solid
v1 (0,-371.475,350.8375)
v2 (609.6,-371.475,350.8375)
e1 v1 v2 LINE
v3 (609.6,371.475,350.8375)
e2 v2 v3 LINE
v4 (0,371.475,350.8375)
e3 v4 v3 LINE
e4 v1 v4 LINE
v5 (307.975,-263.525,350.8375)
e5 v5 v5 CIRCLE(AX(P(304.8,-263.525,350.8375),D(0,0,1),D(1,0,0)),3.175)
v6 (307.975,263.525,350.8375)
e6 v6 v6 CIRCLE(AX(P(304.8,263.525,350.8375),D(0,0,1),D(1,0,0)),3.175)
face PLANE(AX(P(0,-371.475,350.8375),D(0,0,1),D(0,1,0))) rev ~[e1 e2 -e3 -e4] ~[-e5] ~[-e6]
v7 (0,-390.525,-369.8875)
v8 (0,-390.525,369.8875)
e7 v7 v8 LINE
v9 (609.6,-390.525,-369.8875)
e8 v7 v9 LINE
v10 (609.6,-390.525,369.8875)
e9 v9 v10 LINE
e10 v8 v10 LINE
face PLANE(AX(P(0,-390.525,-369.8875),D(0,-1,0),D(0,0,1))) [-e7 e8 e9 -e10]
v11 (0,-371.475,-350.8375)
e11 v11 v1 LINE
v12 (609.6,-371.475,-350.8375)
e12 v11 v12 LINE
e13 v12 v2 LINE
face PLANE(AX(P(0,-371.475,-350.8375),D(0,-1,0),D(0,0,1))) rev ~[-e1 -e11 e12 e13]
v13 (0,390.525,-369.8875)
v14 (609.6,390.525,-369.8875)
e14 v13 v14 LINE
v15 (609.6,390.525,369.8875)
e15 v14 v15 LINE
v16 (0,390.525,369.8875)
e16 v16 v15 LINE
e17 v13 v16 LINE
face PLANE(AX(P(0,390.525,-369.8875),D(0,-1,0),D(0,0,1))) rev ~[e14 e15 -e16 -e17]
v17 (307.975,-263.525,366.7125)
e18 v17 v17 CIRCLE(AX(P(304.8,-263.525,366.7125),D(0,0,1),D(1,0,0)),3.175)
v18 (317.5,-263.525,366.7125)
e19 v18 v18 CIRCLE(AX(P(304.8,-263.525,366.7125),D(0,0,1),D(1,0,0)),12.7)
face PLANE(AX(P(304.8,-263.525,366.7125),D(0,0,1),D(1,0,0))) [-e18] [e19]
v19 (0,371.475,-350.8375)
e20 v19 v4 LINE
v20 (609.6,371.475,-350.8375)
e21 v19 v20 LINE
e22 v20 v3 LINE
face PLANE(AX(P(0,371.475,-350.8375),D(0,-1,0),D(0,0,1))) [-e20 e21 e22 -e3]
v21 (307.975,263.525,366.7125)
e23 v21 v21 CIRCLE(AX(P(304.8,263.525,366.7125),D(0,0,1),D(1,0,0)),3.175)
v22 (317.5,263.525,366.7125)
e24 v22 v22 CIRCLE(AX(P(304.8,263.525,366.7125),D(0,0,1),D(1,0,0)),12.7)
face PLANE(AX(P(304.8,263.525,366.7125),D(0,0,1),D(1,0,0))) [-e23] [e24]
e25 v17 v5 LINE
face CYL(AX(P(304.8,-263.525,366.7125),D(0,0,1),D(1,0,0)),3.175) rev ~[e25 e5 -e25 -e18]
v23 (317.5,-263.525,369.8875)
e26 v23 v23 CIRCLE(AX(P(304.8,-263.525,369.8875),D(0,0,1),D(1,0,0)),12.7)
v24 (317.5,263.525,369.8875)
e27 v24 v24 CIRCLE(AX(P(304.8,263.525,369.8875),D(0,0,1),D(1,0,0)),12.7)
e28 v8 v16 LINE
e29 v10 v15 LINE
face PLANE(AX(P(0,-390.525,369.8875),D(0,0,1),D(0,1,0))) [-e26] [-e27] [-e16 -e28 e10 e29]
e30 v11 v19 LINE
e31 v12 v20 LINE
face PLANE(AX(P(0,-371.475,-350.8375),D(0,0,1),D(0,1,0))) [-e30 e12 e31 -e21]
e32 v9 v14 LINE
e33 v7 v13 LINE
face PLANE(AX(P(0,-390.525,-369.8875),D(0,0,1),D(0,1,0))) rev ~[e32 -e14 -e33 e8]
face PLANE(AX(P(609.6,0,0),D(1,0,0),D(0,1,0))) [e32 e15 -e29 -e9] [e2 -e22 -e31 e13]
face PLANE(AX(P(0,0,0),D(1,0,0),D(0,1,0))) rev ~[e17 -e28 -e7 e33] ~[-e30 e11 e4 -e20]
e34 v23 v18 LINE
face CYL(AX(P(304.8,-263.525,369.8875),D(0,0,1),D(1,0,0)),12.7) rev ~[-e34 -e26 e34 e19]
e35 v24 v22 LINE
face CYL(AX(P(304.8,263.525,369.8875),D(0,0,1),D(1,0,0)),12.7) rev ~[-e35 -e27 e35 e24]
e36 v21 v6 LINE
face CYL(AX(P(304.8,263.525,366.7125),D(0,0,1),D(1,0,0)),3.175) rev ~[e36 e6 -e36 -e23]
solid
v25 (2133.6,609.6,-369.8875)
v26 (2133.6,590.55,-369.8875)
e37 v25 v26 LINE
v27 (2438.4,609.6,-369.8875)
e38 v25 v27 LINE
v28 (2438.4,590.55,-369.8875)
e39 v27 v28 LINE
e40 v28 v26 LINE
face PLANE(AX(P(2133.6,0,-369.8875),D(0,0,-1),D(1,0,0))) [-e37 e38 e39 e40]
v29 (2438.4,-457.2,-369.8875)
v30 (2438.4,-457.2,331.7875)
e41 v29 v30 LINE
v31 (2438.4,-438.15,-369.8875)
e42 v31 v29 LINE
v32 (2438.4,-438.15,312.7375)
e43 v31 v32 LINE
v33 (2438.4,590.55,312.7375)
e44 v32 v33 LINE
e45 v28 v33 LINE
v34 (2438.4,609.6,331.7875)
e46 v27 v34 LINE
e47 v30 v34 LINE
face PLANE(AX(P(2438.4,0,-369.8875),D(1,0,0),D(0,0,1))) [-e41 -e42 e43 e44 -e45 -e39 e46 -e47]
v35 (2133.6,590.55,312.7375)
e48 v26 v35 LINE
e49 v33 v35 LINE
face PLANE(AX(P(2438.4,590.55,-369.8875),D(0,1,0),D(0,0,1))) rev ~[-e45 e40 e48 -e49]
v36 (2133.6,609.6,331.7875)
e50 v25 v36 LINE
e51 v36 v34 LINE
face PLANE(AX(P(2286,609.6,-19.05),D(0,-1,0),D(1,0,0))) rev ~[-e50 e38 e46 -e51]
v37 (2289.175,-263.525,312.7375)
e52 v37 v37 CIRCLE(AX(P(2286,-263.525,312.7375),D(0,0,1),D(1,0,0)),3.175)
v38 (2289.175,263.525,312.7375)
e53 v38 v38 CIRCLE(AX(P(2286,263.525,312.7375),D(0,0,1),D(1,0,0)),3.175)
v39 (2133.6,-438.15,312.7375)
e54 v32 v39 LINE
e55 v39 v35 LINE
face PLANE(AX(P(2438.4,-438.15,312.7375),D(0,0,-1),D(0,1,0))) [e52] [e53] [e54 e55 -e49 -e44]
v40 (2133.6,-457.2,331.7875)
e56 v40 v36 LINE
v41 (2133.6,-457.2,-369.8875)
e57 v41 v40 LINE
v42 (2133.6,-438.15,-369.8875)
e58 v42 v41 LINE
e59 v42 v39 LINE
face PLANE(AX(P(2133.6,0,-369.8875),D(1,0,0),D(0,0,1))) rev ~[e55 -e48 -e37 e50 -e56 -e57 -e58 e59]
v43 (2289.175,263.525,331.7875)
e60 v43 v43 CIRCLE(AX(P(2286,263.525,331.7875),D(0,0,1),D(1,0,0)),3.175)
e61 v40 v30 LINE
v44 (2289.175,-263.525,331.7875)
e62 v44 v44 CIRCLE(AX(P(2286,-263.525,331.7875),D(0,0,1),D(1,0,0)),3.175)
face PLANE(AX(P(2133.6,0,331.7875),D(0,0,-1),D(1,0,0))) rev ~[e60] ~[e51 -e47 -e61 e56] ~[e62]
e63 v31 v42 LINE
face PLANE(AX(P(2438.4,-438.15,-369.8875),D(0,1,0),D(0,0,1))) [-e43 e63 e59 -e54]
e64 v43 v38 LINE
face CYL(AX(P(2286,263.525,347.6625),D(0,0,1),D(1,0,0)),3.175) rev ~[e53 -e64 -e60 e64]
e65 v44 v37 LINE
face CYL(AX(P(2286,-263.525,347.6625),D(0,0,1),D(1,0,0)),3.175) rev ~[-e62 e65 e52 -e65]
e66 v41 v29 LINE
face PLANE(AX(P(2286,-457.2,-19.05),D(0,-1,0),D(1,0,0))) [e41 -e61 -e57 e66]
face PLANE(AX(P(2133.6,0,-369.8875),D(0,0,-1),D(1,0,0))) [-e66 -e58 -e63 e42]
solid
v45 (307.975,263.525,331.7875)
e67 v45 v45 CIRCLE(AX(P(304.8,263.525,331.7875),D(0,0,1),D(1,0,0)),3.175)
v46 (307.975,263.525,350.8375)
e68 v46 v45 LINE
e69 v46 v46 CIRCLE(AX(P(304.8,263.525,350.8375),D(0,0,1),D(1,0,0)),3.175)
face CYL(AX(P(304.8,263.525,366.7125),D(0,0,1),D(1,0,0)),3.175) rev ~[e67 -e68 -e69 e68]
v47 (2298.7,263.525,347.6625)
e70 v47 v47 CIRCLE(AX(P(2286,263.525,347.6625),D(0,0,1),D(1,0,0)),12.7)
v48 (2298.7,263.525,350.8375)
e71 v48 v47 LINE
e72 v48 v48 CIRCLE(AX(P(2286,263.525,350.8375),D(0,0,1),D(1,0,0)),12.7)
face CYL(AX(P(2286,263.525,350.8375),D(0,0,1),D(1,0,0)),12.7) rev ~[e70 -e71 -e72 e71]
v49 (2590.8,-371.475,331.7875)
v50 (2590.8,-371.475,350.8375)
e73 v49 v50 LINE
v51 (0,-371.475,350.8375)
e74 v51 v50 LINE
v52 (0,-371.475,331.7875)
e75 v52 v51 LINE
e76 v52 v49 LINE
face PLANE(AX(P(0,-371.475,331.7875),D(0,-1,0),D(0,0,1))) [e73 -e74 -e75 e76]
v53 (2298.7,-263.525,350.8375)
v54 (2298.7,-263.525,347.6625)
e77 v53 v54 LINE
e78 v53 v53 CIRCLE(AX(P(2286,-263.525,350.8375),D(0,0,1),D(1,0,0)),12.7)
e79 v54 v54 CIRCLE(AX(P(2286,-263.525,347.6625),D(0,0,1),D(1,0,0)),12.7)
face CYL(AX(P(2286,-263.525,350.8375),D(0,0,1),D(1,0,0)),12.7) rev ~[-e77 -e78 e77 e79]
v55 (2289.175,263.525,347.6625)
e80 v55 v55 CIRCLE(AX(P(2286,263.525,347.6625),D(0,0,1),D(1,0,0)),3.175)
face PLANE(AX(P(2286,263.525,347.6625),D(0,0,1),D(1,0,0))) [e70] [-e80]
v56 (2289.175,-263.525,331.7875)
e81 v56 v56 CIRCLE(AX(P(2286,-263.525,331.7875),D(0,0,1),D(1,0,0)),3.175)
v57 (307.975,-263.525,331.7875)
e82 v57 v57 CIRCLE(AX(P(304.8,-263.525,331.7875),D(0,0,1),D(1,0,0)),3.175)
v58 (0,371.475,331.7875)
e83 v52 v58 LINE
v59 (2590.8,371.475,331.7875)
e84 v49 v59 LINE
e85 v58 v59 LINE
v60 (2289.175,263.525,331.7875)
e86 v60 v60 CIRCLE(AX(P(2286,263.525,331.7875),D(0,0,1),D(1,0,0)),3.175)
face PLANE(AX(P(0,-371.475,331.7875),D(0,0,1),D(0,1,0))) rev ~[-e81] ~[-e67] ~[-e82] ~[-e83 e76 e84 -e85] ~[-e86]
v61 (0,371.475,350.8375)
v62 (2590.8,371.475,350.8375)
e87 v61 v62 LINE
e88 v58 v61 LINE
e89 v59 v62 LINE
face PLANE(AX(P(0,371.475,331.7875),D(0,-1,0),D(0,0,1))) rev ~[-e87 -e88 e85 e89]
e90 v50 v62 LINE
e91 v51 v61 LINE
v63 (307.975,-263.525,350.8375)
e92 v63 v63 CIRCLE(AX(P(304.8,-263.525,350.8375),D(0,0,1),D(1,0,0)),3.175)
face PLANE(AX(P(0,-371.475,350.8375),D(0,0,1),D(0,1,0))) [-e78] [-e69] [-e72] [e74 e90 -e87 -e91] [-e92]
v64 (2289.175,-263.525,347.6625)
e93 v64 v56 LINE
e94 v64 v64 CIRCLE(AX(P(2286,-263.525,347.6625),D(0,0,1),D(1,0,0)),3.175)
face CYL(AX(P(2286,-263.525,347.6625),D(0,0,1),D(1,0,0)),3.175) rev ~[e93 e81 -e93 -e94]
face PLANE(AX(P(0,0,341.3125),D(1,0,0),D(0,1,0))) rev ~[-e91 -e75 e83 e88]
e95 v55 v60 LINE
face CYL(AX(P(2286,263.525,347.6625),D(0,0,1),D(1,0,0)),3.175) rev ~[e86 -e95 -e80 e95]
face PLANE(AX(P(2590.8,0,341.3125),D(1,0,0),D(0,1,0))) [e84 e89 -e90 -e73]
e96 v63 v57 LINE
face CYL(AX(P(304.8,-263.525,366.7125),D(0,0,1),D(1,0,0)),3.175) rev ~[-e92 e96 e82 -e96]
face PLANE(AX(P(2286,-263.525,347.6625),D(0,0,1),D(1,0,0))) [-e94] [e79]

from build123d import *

# Parameters (mm, degrees)
F0_W          = 781.05
F0_H          = 739.775
F0_W_2        = 742.95
F0_H_2        = 701.675
F1_DEPTH      = 609.6
F2_W          = 742.95
F2_H          = 19.05
F3_DEPTH      = 2590.8
F4_W          = 304.8
F4_H          = 701.675
F5_DEPTH      = 457.2
F5_DEPTH_BACK = 609.6
F6_W          = 1028.7
F6_H          = 682.625
F7_DEPTH      = 2438.401
F8_R          = 12.7
F9_DEPTH      = 3.175
F10_R         = 12.7
F11_DEPTH     = 3.175
F12_R         = 3.175
F13_DEPTH     = 717.551
F14_R         = 3.175
F15_DEPTH     = 717.551
F16_R         = 3.175
F17_DEPTH     = 127
F19_R         = 3.175
F20_DEPTH     = 317.5


with BuildPart() as f1:
    # F0 (on Right) → F1 (new body)
    with BuildSketch(Plane.YZ):
        Rectangle(F0_W, F0_H)
        Rectangle(F0_W_2, F0_H_2, mode=Mode.SUBTRACT)
    extrude(amount=F1_DEPTH)

    # F8 (on face) → F9 (cut)
    with BuildSketch(Plane.XY.offset(369.8875)):
        with Locations((304.8, 263.525)):
            Circle(F8_R)
        with Locations((304.8, -263.525)):
            Circle(F8_R)
    extrude(amount=-F9_DEPTH, mode=Mode.SUBTRACT)


with BuildPart() as f3:
    # F2 (on Right) → F3 (new body)
    with BuildSketch(Plane.YZ):
        with Locations((0, 341.3125)):
            Rectangle(F2_W, F2_H)
    extrude(amount=F3_DEPTH)

    # F10 (on face) → F11 (cut)
    with BuildSketch(Plane.XY.offset(350.8375)):
        with Locations((2286, -263.525)):
            Circle(F10_R)
        with Locations((2286, 263.525)):
            Circle(F10_R)
    extrude(amount=-F11_DEPTH, mode=Mode.SUBTRACT)


with BuildPart() as f5:
    # F4 (on Front) → F5 (new body, two sides)
    with BuildSketch(Plane.XZ) as f5_sk:
        with Locations((2286, -19.05)):
            Rectangle(F4_W, F4_H)
    extrude(amount=F5_DEPTH)
    extrude(f5_sk.sketch, amount=-F5_DEPTH_BACK)

    # F6 (on face) → F7 (cut, through all)
    with BuildSketch(Plane.YZ.offset(2438.4)):
        with Locations((76.2, -28.575)):
            Rectangle(F6_W, F6_H)
    extrude(amount=-F7_DEPTH, mode=Mode.SUBTRACT)


with BuildPart() as f13_tool:
    # F12 (on face) → F13 (new body, through all)
    with BuildSketch(Plane.XY.offset(347.6625)):
        with Locations((2286, 263.525)):
            Circle(F12_R)
    extrude(amount=-F13_DEPTH)


with BuildPart() as f3_1:
    add(f3.part)

    # F13: cut by f13_tool
    add(f13_tool.part, mode=Mode.SUBTRACT)


with BuildPart() as f5_1:
    add(f5.part)

    # F13: cut by f13_tool
    add(f13_tool.part, mode=Mode.SUBTRACT)


with BuildPart() as f15_tool:
    # F14 (on face) → F15 (new body, through all)
    with BuildSketch(Plane.XY.offset(347.6625)):
        with Locations((2286, -263.525)):
            Circle(F14_R)
    extrude(amount=-F15_DEPTH)


with BuildPart() as f3_2:
    add(f3_1.part)

    # F15: cut by f15_tool
    add(f15_tool.part, mode=Mode.SUBTRACT)


with BuildPart() as f5_2:
    add(f5_1.part)

    # F15: cut by f15_tool
    add(f15_tool.part, mode=Mode.SUBTRACT)


with BuildPart() as f17_tool:
    # F16 (on face) → F17 (new body)
    with BuildSketch(Plane.XY.offset(366.7125)):
        with Locations((304.8, 263.525)):
            Circle(F16_R)
    extrude(amount=-F17_DEPTH)


with BuildPart() as f1_1:
    add(f1.part)

    # F17: cut by f17_tool
    add(f17_tool.part, mode=Mode.SUBTRACT)


with BuildPart() as f3_3:
    add(f3_2.part)

    # F17: cut by f17_tool
    add(f17_tool.part, mode=Mode.SUBTRACT)


with BuildPart() as f20_tool:
    # F19 (on face) → F20 (new body)
    with BuildSketch(Plane.XY.offset(366.7125)):
        with Locations((304.8, -263.525)):
            Circle(F19_R)
    extrude(amount=-F20_DEPTH)


with BuildPart() as f1_2:
    add(f1_1.part)

    # F20: cut by f20_tool
    add(f20_tool.part, mode=Mode.SUBTRACT)


with BuildPart() as f3_4:
    add(f3_3.part)

    # F20: cut by f20_tool
    add(f20_tool.part, mode=Mode.SUBTRACT)


solid = Compound([f5_2.part, f1_2.part, f3_4.part])
